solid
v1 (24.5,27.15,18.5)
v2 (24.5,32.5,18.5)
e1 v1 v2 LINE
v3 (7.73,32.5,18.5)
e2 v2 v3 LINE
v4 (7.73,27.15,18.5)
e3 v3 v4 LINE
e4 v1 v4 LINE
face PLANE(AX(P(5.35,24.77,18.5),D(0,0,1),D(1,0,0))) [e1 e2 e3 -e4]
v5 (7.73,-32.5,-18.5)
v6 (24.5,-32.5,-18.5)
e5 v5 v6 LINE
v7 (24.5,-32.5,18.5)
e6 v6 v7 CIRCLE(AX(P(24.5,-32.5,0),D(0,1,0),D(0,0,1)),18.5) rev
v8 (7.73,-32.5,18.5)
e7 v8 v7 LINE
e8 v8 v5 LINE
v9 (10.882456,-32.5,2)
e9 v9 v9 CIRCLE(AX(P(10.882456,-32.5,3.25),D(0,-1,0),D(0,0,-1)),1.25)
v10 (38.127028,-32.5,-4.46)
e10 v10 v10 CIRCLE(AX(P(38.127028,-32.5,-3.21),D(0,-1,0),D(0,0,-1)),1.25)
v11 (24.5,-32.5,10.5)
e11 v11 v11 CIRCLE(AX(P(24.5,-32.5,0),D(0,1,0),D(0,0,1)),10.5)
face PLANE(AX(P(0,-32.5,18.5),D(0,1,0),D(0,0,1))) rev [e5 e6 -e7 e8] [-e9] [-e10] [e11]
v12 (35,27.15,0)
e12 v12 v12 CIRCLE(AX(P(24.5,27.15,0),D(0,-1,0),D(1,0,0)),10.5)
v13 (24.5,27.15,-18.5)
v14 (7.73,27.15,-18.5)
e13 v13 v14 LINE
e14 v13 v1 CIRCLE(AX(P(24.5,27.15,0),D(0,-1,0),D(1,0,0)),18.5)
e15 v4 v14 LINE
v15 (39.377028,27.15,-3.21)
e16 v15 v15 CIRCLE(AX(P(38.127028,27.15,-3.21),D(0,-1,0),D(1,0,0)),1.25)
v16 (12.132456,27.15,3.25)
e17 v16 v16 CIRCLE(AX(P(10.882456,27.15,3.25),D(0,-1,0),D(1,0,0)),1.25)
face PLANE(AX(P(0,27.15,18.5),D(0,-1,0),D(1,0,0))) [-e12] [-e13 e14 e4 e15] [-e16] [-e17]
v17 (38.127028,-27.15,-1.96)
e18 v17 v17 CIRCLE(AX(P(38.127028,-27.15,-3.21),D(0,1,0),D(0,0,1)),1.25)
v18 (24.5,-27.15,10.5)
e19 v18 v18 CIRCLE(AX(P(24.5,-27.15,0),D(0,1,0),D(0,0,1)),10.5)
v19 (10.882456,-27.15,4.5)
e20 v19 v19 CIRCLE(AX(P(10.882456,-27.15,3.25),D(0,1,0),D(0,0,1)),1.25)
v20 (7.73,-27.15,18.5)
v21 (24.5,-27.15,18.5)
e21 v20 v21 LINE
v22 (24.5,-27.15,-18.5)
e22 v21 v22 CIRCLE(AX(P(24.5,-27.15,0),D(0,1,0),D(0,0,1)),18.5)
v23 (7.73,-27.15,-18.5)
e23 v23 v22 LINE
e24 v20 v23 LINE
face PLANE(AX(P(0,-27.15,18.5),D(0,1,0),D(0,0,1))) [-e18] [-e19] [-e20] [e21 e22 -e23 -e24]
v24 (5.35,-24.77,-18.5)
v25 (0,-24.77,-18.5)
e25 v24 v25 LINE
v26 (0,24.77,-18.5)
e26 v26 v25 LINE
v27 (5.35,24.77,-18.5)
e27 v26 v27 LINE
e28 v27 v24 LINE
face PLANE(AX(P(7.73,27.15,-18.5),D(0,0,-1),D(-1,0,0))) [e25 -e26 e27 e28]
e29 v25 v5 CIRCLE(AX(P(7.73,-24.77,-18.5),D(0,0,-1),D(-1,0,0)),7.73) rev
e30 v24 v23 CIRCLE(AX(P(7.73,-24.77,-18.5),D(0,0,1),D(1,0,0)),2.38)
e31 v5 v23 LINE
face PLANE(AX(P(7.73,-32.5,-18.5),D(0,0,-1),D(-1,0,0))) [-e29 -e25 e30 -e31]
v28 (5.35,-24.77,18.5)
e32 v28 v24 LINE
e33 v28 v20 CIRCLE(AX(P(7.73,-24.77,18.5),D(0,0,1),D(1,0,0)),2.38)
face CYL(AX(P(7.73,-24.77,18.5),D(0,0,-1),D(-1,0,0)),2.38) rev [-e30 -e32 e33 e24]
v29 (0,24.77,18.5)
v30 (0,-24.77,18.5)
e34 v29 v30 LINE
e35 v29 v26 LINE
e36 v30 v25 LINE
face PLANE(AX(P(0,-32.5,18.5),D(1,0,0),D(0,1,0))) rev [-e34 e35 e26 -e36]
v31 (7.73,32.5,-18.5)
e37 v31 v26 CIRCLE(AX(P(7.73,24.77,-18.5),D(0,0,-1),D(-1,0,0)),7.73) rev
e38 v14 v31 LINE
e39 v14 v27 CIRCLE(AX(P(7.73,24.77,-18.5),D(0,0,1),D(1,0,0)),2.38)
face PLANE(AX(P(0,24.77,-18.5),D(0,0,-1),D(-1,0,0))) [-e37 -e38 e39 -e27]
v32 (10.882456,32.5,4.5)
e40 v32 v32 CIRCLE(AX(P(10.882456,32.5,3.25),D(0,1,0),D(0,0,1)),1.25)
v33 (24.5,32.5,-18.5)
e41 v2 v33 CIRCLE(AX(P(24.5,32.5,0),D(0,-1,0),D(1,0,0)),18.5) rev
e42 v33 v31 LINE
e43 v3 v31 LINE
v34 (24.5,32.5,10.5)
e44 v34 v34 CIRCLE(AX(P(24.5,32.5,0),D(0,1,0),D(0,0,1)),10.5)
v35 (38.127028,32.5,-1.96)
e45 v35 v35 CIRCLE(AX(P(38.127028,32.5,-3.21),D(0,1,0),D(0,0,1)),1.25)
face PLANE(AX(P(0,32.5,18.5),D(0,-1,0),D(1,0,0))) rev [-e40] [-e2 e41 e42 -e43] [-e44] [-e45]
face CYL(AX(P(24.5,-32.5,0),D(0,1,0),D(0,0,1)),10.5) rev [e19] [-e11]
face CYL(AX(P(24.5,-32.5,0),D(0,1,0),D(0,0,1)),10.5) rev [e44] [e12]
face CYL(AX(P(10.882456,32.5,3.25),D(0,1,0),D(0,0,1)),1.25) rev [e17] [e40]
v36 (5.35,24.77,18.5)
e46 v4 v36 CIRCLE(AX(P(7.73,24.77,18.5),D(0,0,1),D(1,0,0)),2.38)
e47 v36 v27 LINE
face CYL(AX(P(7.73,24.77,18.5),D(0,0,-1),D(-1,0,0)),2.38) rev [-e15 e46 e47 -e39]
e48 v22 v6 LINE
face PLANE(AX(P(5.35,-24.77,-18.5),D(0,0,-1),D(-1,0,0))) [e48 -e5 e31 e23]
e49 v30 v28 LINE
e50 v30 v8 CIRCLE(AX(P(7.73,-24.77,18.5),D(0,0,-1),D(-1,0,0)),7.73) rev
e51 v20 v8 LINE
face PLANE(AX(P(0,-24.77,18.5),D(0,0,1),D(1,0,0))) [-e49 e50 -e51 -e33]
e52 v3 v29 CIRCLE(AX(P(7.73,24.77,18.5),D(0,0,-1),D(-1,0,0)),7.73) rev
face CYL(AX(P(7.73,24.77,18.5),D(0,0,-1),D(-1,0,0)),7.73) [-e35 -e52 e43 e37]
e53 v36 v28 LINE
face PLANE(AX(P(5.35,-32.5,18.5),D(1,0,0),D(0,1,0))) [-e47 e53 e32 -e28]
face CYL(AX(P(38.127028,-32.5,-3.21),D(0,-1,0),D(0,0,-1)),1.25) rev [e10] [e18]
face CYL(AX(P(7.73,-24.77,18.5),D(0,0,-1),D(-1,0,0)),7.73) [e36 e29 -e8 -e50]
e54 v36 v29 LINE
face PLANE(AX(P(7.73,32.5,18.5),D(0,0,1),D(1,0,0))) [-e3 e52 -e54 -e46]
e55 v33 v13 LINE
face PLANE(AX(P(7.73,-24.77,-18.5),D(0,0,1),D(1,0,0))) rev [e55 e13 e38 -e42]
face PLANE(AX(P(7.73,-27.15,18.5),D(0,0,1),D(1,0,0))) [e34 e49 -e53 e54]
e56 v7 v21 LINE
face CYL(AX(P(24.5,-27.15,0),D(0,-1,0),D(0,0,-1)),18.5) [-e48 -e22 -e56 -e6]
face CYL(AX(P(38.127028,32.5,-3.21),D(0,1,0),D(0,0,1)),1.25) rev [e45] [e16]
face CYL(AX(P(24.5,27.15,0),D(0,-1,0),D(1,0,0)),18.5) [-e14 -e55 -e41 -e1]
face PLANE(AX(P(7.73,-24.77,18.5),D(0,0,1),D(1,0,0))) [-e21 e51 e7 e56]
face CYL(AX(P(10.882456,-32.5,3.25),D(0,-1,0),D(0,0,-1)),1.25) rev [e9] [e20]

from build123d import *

# Parameters (mm, degrees)
BASE_FLANGE1_DEPTH        = 18.5
FILLET3_RADIUS            = 18.5
FILLET3_LENGTH            = 5.35
FILLET4_RADIUS            = 18.5
FILLET4_LENGTH            = 5.35
CUT_EXTRUDE6_DEPTH        = 57.986840586
CUT_EXTRUDE6_DEPTH_BACK   = 57.986840586
SKETCH23_R                = 10.5
M3X0_5_TAPPED_HOLE1_D     = 2.5
M3X0_5_TAPPED_HOLE1_DEPTH = 5.35
M3X0_5_TAPPED_HOLE2_D     = 2.5


# Sheet-metal steps are written as plain solids
with BuildPart() as part:
    # Sketch20 → Base-Flange1 (new, symmetric)
    with BuildSketch(Plane.XY):
        with BuildLine():
            Line((43, -32.5), (7.730000066, -32.5))
            ThreePointArc((7.730000066, -32.5), (2.264064601, -30.235935399), (0, -24.769999934))
            Line((0, -24.769999934), (0, 24.769999934))
            ThreePointArc((0, 24.769999934), (2.264064601, 30.235935399), (7.730000066, 32.5))
            Line((7.730000066, 32.5), (43, 32.5))
            Line((43, 32.5), (43, 27.15))
            Line((43, 27.15), (7.730000066, 27.15))
            ThreePointArc((7.730000066, 27.15), (6.04708588, 26.45291412), (5.35, 24.769999934))
            Line((5.35, 24.769999934), (5.35, -24.769999934))
            ThreePointArc((5.35, -24.769999934), (6.04708588, -26.45291412), (7.730000066, -27.15))
            Line((7.730000066, -27.15), (43, -27.15))
            Line((43, -27.15), (43, -32.5))
        make_face()
    extrude(amount=BASE_FLANGE1_DEPTH, both=True)

    # Fillet3: full round fillet: the end face becomes a half cylinder, R = half its width
    fillet3_face = Plane((43, 29.825, 0), x_dir=(0, 1, 0), z_dir=(1, 0, 0))  # on the end face: x along it, z out of the body
    fillet3_slab = fillet3_face.offset(-FILLET3_RADIUS / 2) * Box(FILLET3_LENGTH, 2 * FILLET3_RADIUS, FILLET3_RADIUS, mode=Mode.PRIVATE)  # the body's end, R deep
    fillet3_round = Plane((24.5, 29.825, 0), x_dir=(1, 0, 0), z_dir=(0, 1, 0)) * Cylinder(FILLET3_RADIUS, FILLET3_LENGTH, mode=Mode.PRIVATE)  # its axis R under the face
    add(fillet3_slab - fillet3_round, mode=Mode.SUBTRACT)

    # Fillet4: full round fillet: the end face becomes a half cylinder, R = half its width
    fillet4_face = Plane((43, -29.825, 0), x_dir=(0, 1, 0), z_dir=(1, 0, 0))  # on the end face: x along it, z out of the body
    fillet4_slab = fillet4_face.offset(-FILLET4_RADIUS / 2) * Box(FILLET4_LENGTH, 2 * FILLET4_RADIUS, FILLET4_RADIUS, mode=Mode.PRIVATE)  # the body's end, R deep
    fillet4_round = Plane((24.5, -29.825, 0), x_dir=(1, 0, 0), z_dir=(0, 1, 0)) * Cylinder(FILLET4_RADIUS, FILLET4_LENGTH, mode=Mode.PRIVATE)  # its axis R under the face
    add(fillet4_slab - fillet4_round, mode=Mode.SUBTRACT)

    # Sketch23 → Cut-Extrude6 (cut, two sides: drawn at the far end of the back side and taken through both)
    with BuildSketch(Plane(origin=(0, 0, 0), x_dir=(1, 0, 0), z_dir=(0, 1, 0)).offset(-CUT_EXTRUDE6_DEPTH_BACK)):
        with Locations(Location((24.5, 0, 0), (0, 0, 270))):
            Circle(SKETCH23_R)
    extrude(amount=CUT_EXTRUDE6_DEPTH + CUT_EXTRUDE6_DEPTH_BACK, mode=Mode.SUBTRACT)

    # M3x0.5 Tapped Hole1
    with Locations(Plane(origin=(0, 32.5, 0), x_dir=(1, 0, 0), z_dir=(0, 1, 0))):
        with Locations((38.127028289, 3.21), (10.882456169, -3.25)):
            Hole(M3X0_5_TAPPED_HOLE1_D / 2, depth=M3X0_5_TAPPED_HOLE1_DEPTH)

    # M3x0.5 Tapped Hole2 (through all)
    with Locations(Plane(origin=(0, -32.5, 0), x_dir=(-1, 0, 0), z_dir=(0, -1, 0))):
        with Locations((-10.882456169, -3.25), (-38.127028289, 3.21)):
            Hole(M3X0_5_TAPPED_HOLE2_D / 2)


solid = part.part
